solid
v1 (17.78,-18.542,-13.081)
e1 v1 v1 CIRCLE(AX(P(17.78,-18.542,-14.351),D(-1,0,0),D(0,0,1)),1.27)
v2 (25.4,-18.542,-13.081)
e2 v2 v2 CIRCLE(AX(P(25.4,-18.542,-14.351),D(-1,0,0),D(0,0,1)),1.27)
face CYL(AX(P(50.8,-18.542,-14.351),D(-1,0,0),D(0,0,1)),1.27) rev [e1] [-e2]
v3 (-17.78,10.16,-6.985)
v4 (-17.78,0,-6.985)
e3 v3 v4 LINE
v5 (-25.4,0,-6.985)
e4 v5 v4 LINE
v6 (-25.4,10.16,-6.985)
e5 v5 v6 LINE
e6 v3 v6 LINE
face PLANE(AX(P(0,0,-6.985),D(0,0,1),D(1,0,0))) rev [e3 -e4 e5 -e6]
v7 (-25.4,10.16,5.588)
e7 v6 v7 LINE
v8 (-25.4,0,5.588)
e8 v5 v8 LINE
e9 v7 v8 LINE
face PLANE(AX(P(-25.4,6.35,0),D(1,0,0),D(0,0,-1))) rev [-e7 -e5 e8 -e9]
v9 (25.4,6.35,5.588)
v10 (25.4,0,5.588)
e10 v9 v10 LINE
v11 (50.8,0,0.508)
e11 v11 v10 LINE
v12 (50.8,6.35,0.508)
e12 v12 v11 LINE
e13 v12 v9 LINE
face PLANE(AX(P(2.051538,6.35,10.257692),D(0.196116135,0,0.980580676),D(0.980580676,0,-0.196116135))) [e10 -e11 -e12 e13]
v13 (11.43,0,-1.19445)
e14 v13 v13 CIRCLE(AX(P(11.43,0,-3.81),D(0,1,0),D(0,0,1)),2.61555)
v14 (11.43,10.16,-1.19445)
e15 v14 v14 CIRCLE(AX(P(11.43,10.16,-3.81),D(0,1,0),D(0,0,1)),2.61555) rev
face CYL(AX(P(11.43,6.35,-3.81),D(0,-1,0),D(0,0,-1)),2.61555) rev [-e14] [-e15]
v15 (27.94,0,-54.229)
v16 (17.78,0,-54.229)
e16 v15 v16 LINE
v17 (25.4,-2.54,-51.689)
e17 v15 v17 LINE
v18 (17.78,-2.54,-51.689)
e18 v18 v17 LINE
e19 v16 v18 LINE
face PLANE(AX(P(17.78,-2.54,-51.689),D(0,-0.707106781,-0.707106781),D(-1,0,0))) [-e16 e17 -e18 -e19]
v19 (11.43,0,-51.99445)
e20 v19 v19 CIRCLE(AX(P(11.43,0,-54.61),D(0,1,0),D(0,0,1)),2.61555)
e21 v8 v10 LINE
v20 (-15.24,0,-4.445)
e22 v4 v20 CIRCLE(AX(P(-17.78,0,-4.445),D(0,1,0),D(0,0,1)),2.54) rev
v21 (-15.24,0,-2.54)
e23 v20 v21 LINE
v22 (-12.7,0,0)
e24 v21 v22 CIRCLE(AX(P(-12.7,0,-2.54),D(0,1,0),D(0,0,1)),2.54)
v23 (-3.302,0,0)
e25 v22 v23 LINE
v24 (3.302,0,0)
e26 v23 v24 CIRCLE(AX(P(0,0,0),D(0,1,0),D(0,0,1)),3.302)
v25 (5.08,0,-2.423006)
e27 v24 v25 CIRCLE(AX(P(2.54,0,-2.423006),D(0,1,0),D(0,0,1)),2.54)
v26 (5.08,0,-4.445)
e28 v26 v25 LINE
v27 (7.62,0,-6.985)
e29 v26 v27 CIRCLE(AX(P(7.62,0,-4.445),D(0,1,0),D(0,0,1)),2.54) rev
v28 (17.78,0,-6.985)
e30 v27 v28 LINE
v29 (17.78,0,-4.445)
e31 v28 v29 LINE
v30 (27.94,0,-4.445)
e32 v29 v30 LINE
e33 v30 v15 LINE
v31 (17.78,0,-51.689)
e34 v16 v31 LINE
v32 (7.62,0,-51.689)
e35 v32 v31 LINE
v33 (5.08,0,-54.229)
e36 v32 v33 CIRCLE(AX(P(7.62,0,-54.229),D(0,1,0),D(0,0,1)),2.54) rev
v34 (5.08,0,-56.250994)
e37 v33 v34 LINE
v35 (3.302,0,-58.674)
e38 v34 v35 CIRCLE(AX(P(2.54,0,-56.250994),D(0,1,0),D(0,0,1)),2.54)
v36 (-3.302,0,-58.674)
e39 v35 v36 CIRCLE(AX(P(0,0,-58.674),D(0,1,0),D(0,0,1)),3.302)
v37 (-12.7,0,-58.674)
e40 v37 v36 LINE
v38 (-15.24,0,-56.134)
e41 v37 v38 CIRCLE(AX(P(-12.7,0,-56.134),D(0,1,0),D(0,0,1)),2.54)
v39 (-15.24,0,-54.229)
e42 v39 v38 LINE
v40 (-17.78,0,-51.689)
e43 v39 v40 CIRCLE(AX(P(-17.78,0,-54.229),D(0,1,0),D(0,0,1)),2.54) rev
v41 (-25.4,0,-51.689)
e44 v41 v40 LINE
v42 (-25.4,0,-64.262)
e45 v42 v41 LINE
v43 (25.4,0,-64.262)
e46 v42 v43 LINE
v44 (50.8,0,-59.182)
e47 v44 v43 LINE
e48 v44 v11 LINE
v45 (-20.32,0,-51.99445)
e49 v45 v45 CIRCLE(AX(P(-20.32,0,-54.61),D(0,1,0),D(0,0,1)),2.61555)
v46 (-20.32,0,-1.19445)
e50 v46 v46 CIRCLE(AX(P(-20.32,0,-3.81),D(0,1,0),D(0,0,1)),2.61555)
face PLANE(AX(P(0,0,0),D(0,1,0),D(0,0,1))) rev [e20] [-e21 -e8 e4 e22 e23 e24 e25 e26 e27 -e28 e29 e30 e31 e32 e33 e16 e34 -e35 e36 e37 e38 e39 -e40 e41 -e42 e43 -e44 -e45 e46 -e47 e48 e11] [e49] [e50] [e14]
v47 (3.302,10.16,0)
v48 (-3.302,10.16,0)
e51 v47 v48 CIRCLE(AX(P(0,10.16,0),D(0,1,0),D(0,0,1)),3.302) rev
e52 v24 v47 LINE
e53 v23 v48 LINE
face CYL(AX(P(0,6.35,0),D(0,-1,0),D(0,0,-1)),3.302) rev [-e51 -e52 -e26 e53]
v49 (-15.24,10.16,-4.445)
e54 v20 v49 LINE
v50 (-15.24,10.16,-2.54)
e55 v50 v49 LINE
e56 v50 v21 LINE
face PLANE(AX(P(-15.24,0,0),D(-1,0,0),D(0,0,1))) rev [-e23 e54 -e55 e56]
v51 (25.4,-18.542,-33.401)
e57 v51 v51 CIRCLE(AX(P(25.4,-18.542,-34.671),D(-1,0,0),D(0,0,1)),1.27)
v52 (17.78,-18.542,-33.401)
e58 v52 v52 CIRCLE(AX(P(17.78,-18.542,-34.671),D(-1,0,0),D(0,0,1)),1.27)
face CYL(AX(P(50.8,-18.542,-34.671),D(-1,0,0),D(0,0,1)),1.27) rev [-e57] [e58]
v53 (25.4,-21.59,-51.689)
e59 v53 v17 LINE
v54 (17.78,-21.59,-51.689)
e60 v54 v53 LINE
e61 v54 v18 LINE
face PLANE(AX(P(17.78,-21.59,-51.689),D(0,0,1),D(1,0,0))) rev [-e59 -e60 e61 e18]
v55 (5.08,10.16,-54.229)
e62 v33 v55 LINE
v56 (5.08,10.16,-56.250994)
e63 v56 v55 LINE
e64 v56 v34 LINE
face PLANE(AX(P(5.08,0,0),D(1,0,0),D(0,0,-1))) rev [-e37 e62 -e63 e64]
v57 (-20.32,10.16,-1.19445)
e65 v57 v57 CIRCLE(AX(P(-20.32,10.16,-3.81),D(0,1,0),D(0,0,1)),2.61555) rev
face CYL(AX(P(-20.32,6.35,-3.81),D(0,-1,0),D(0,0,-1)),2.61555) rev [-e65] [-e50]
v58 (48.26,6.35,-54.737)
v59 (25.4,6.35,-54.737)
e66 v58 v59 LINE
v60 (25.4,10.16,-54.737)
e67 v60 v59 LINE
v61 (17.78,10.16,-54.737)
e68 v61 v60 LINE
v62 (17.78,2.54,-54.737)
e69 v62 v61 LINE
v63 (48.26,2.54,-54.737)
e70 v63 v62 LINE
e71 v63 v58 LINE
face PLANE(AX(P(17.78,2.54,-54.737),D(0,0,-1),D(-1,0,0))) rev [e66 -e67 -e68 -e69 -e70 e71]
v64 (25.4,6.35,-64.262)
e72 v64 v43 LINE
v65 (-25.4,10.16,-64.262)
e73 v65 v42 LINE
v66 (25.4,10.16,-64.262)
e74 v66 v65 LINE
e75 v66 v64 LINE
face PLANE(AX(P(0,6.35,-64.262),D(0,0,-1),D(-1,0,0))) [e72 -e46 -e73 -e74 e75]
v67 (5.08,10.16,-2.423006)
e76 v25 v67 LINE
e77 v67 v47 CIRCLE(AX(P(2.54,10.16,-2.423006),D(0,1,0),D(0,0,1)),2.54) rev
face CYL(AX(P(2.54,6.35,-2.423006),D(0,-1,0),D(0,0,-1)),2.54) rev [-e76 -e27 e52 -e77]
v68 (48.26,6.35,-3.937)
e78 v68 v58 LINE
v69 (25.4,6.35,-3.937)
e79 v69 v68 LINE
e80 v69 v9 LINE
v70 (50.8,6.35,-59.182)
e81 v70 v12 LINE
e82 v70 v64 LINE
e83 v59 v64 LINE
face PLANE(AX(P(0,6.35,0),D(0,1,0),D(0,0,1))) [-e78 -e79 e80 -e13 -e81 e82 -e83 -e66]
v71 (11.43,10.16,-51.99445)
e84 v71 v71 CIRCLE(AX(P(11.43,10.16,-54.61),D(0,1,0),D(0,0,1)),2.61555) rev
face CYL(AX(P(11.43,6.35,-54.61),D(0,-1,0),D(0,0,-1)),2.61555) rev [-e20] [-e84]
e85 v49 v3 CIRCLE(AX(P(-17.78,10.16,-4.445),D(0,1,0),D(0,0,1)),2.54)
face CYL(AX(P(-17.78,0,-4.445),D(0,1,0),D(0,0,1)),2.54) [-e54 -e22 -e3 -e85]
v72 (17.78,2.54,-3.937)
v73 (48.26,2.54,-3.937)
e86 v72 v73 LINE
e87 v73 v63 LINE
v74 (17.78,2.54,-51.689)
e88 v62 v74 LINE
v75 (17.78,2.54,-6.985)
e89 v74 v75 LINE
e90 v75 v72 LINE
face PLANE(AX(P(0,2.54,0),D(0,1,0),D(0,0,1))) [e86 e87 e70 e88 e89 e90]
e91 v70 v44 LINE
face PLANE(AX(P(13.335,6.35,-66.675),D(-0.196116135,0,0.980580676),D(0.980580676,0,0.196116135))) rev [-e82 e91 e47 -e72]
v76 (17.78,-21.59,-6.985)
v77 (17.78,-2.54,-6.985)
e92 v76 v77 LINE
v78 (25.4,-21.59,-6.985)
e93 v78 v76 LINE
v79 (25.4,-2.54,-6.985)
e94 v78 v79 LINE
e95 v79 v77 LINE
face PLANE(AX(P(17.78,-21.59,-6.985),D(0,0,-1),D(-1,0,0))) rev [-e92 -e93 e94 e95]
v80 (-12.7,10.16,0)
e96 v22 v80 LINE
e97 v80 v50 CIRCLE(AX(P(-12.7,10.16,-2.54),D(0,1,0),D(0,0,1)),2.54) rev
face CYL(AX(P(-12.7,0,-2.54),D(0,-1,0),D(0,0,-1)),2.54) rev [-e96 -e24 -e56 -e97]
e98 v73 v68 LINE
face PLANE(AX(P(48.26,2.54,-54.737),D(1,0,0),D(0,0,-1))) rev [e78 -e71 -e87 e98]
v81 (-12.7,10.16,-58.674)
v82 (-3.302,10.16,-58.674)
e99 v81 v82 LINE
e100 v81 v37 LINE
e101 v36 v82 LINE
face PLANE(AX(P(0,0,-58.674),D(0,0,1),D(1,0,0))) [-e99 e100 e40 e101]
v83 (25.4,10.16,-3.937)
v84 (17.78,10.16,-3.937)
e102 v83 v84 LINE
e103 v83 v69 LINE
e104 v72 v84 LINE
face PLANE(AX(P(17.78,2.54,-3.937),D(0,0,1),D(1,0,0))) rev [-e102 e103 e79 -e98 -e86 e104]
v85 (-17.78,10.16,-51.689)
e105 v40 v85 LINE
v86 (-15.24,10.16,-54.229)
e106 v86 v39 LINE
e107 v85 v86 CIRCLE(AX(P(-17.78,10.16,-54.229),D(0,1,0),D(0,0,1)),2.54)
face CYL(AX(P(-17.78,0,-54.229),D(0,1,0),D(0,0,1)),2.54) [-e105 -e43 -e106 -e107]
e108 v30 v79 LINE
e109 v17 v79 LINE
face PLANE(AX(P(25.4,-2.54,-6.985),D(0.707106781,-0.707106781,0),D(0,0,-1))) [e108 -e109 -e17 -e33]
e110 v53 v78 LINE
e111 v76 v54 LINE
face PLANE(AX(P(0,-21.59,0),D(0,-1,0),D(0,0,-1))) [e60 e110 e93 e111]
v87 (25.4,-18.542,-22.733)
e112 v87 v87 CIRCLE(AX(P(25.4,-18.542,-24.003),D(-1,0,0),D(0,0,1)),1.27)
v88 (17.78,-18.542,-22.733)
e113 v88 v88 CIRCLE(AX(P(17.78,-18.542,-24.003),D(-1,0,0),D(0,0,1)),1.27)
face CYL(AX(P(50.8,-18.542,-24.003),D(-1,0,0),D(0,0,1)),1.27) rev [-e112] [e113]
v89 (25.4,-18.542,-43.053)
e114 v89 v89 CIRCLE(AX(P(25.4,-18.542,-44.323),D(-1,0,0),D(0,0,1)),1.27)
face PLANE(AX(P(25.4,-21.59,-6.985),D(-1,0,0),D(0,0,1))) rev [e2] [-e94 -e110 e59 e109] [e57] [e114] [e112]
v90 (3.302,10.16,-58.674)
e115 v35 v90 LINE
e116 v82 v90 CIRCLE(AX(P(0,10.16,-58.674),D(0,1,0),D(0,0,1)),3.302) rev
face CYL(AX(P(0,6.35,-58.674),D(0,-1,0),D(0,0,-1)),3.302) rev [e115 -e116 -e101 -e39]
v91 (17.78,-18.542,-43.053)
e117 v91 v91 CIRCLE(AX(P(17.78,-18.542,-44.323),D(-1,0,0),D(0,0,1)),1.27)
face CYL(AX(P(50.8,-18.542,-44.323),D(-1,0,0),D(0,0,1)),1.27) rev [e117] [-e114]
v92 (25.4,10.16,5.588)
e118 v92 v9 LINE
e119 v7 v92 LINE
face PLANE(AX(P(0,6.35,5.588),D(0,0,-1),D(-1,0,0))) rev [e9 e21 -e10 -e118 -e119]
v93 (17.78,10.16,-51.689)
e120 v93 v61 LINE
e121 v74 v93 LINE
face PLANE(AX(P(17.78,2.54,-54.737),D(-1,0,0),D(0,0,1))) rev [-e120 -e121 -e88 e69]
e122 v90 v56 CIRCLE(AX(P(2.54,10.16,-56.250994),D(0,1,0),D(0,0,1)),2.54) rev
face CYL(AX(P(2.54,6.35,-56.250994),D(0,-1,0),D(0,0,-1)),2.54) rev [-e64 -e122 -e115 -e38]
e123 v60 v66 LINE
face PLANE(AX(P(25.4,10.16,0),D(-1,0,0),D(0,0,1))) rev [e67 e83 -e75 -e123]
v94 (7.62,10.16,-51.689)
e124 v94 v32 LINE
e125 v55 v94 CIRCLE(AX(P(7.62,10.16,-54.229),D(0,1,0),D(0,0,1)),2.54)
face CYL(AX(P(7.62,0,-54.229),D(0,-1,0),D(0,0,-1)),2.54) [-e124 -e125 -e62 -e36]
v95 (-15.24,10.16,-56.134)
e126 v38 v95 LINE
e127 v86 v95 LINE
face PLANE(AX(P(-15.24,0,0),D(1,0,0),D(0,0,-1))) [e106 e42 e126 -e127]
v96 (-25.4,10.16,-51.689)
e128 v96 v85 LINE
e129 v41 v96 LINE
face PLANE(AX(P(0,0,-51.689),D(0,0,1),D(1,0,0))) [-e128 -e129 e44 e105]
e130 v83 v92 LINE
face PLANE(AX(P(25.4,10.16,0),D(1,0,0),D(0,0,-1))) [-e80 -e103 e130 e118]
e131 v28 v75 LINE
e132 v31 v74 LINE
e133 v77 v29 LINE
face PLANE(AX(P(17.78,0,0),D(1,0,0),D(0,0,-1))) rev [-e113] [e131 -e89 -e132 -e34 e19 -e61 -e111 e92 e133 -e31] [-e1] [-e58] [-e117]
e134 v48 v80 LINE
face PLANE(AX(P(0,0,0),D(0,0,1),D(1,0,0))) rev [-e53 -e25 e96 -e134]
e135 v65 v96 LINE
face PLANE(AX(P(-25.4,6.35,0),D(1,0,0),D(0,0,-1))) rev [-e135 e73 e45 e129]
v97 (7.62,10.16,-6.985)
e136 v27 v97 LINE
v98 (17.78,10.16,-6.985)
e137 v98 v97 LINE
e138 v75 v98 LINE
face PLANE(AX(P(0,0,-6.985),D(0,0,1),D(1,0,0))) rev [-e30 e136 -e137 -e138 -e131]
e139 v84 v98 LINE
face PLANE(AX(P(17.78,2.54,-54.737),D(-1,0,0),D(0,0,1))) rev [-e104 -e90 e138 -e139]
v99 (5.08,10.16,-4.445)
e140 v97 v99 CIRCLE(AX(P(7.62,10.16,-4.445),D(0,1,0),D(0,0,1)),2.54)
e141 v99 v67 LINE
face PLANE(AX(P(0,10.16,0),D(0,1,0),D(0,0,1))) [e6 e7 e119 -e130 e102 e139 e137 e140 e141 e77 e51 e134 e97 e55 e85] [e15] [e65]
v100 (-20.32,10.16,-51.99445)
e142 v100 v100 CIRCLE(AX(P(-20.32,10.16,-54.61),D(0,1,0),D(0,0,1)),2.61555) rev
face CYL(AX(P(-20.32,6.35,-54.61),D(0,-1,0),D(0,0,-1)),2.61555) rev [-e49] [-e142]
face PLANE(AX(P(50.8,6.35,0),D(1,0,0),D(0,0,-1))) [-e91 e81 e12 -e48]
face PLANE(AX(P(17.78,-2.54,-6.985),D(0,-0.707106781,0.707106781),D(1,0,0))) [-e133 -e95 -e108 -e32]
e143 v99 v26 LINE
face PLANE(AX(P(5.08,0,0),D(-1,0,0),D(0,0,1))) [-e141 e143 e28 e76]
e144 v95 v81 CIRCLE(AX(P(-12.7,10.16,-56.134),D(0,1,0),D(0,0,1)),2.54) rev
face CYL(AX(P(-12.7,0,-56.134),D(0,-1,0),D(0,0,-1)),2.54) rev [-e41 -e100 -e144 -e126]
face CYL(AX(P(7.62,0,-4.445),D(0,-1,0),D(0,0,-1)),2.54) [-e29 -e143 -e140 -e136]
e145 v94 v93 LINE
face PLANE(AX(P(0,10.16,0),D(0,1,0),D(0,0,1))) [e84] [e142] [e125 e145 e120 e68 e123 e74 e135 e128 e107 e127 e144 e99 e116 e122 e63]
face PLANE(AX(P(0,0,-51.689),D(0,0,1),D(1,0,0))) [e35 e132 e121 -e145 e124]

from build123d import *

# Parameters (mm, degrees)
SKETCH1_R           = 3.302
SKETCH1_R_2         = 2.615549664
BOSS_EXTRUDE1_DEPTH = 6.35
SKETCH2_W           = 30.48
SKETCH2_H           = 50.8
CUT_EXTRUDE1_DEPTH  = 3.81
CUT_EXTRUDE2_DEPTH  = 83.161835082
SKETCH13_R          = 2.615549664
BOSS_EXTRUDE7_DEPTH = 3.81
SKETCH15_W          = 7.62
SKETCH15_H          = 44.704
BOSS_EXTRUDE8_DEPTH = 21.59
SKETCH16_R          = 1.27
CUT_EXTRUDE3_DEPTH  = 81.375650193
FILLET1_R           = 2.54
CHAMFER2_SIZE       = 2.54


with BuildPart() as part:
    # Sketch1 → Boss-Extrude1 (new body)
    with BuildSketch(Plane(origin=(0, 0, 0), x_dir=(1, 0, 0), z_dir=(0, 1, 0))):
        Polygon((50.8, -0.508), (25.4, -5.588), (-25.4, -5.588), (-25.4, 64.262), (25.4, 64.262), (50.8, 59.182), align=None)
        with Locations(Location((0, 0, 0), (0, 0, 270))):
            Circle(SKETCH1_R, mode=Mode.SUBTRACT)
        with Locations(Location((0, 58.674, 0), (0, 0, 270))):
            Circle(SKETCH1_R, mode=Mode.SUBTRACT)
        with Locations(Location((11.43, 54.61, 0), (0, 0, 270))):
            Circle(SKETCH1_R_2, mode=Mode.SUBTRACT)
        with Locations(Location((-20.32, 54.61, 0), (0, 0, 270))):
            Circle(SKETCH1_R_2, mode=Mode.SUBTRACT)
        with Locations(Location((-20.32, 3.81, 0), (0, 0, 270))):
            Circle(SKETCH1_R_2, mode=Mode.SUBTRACT)
        with Locations(Location((11.43, 3.81, 0), (0, 0, 270))):
            Circle(SKETCH1_R_2, mode=Mode.SUBTRACT)
    extrude(amount=BOSS_EXTRUDE1_DEPTH)

    # Sketch2 → Cut-Extrude1 (cut)
    with BuildSketch(Plane(origin=(0, 6.35, 0), x_dir=(1, 0, 0), z_dir=(0, 1, 0))):
        with Locations((33.02, 29.337)):
            Rectangle(SKETCH2_W, SKETCH2_H)
    extrude(amount=-CUT_EXTRUDE1_DEPTH, mode=Mode.SUBTRACT)

    # Sketch3 → Cut-Extrude2 (cut, through all)
    with BuildSketch(Plane(origin=(0, 6.35, 0), x_dir=(1, 0, 0), z_dir=(0, 1, 0))):
        with BuildLine():
            Line((-15.24, 58.674), (-15.24, 51.689))
            Line((-15.24, 51.689), (5.08, 51.689))
            Line((5.08, 51.689), (5.08, 58.674))
            Line((5.08, 58.674), (3.302, 58.674))
            ThreePointArc((3.302, 58.674), (0, 55.372), (-3.302, 58.674))
            Line((-3.302, 58.674), (-15.24, 58.674))
        make_face()
        Polygon((-15.24, 51.689), (-25.4, 51.689), (-25.4, 6.985), (-15.24, 6.985), (5.08, 6.985), (17.78, 6.985), (17.78, 51.689), (5.08, 51.689), align=None)
        with BuildLine():
            Line((5.08, 6.985), (-15.24, 6.985))
            Line((-15.24, 6.985), (-15.24, 0))
            Line((-15.24, 0), (-3.302, 0))
            ThreePointArc((-3.302, 0), (0, 3.302), (3.302, 0))
            Line((3.302, 0), (5.08, 0))
            Line((5.08, 0), (5.08, 6.985))
        make_face()
    extrude(amount=-CUT_EXTRUDE2_DEPTH, mode=Mode.SUBTRACT)

    # Sketch13 → Boss-Extrude7 (add)
    # profile 1 of 2: a face of its own
    with BuildSketch(Plane(origin=(0, 6.35, 0), x_dir=(1, 0, 0), z_dir=(0, 1, 0))):
        with BuildLine():
            Line((-25.4, 64.262), (-25.4, 51.689))
            Line((-25.4, 51.689), (-15.24, 51.689))
            Line((-15.24, 51.689), (-15.24, 58.674))
            Line((-15.24, 58.674), (-3.302, 58.674))
            ThreePointArc((-3.302, 58.674), (0, 61.976), (3.302, 58.674))
            Line((3.302, 58.674), (5.08, 58.674))
            Line((5.08, 58.674), (5.08, 51.689))
            Line((5.08, 51.689), (17.78, 51.689))
            Line((17.78, 51.689), (17.78, 54.737))
            Line((17.78, 54.737), (25.4, 54.737))
            Line((25.4, 54.737), (25.4, 64.262))
            Line((25.4, 64.262), (-25.4, 64.262))
        make_face()
        with Locations(Location((-20.32, 54.61, 0), (0, 0, 270))):
            Circle(SKETCH13_R, mode=Mode.SUBTRACT)
        with Locations(Location((11.43, 54.61, 0), (0, 0, 270))):
            Circle(SKETCH13_R, mode=Mode.SUBTRACT)
    # profile 2 of 2: a face of its own
    with BuildSketch(Plane(origin=(0, 6.35, 0), x_dir=(1, 0, 0), z_dir=(0, 1, 0))):
        with BuildLine():
            Line((-15.24, 6.985), (-25.4, 6.985))
            Line((-25.4, 6.985), (-25.4, -5.588))
            Line((-25.4, -5.588), (25.4, -5.588))
            Line((25.4, -5.588), (25.4, 3.937))
            Line((25.4, 3.937), (17.78, 3.937))
            Line((17.78, 3.937), (17.78, 6.985))
            Line((17.78, 6.985), (5.08, 6.985))
            Line((5.08, 6.985), (5.08, 0))
            Line((5.08, 0), (3.302, 0))
            ThreePointArc((3.302, 0), (0, -3.302), (-3.302, 0))
            Line((-3.302, 0), (-15.24, 0))
            Line((-15.24, 0), (-15.24, 6.985))
        make_face()
        with Locations(Location((-20.32, 3.81, 0), (0, 0, 270))):
            Circle(SKETCH13_R, mode=Mode.SUBTRACT)
        with Locations(Location((11.43, 3.81, 0), (0, 0, 270))):
            Circle(SKETCH13_R, mode=Mode.SUBTRACT)
    extrude(amount=BOSS_EXTRUDE7_DEPTH)

    # Sketch15 → Boss-Extrude8 (add)
    with BuildSketch(Plane.XZ):
        with Locations((21.59, -29.337)):
            Rectangle(SKETCH15_W, SKETCH15_H)
    extrude(amount=BOSS_EXTRUDE8_DEPTH)

    # Sketch16 → Cut-Extrude3 (cut, through all)
    with BuildSketch(Plane.ZY.offset(-17.78)):
        with Locations((-44.323, -18.542)):
            Circle(SKETCH16_R)
        with Locations((-34.671, -18.542)):
            Circle(SKETCH16_R)
        with Locations((-24.003, -18.542)):
            Circle(SKETCH16_R)
        with Locations((-14.351, -18.542)):
            Circle(SKETCH16_R)
    extrude(amount=-CUT_EXTRUDE3_DEPTH, mode=Mode.SUBTRACT)

    # Fillet1
    # the kernel refuses this fillet: 2.54 mm, written as the material it adds along each edge
    with BuildSketch(Plane(origin=(-15.24, 0, -58.674), x_dir=(0, 0, 1), z_dir=(0, 1, 0))) as fillet1_piece_1:
        with BuildLine():
            CenterArc((FILLET1_R, FILLET1_R), FILLET1_R, 180, 90)
            Line((0, FILLET1_R), (0, 0))
            Line((0, 0), (FILLET1_R, 0))
        make_face()
    extrude(amount=10.16)
    with BuildSketch(Plane(origin=(5.08, 10.16, -58.674), x_dir=(-1, 0, 0), z_dir=(0, -1, 0))) as fillet1_piece_2:
        with BuildLine():
            CenterArc((2.54, -2.423005572), FILLET1_R, 107.457603124, 72.542396876)
            Line((0, -2.423005572), (0, 0))
            Line((0, 0), (1.778, 0))
        make_face()
    extrude(amount=10.16)
    with BuildSketch(Plane(origin=(5.08, 10.16, 0), x_dir=(0, 0, -1), z_dir=(0, -1, 0))) as fillet1_piece_3:
        with BuildLine():
            CenterArc((2.423005572, -2.54), FILLET1_R, 90, 72.542396876)
            Line((0, -1.778), (0, 0))
            Line((0, 0), (2.423005572, 0))
        make_face()
    extrude(amount=10.16)
    with BuildSketch(Plane(origin=(-15.24, 10.16, 0), x_dir=(1, 0, 0), z_dir=(0, -1, 0))) as fillet1_piece_4:
        with BuildLine():
            CenterArc((FILLET1_R, -FILLET1_R), FILLET1_R, 90, 90)
            Line((0, -FILLET1_R), (0, 0))
            Line((0, 0), (FILLET1_R, 0))
        make_face()
    extrude(amount=10.16)
    # the kernel refuses this fillet: 2.54 mm, written as the material it takes off along each edge
    with BuildSketch(Plane(origin=(-15.24, -6.35, -51.689), x_dir=(-1, 0, 0), z_dir=(0, 1, 0))) as fillet1_2_piece_1:
        with BuildLine():
            CenterArc((FILLET1_R, -FILLET1_R), FILLET1_R, 90, 90)
            Line((0, -FILLET1_R), (0, 0))
            Line((0, 0), (FILLET1_R, 0))
        make_face()
    extrude(amount=22.86, mode=Mode.SUBTRACT)
    with BuildSketch(Plane(origin=(5.08, 16.51, -51.689), x_dir=(0, 0, -1), z_dir=(0, -1, 0)), Plane(origin=(5.08, 16.51, -6.985), x_dir=(1, 0, 0), z_dir=(0, -1, 0)), Plane(origin=(-15.24, 16.51, -6.985), x_dir=(0, 0, 1), z_dir=(0, -1, 0))) as fillet1_2_piece_2:
        with BuildLine():
            CenterArc((FILLET1_R, FILLET1_R), FILLET1_R, 180, 90)
            Line((0, FILLET1_R), (0, 0))
            Line((0, 0), (FILLET1_R, 0))
        make_face()
    extrude(amount=22.86, mode=Mode.SUBTRACT)

    # Chamfer2
    chamfer2_edges = [part.edges().sort_by_distance(p)[0] for p in [
        (21.59, 0, -51.689),
        (25.4, 0, -29.337),
        (21.59, 0, -6.985),
    ]]
    chamfer(chamfer2_edges, length=CHAMFER2_SIZE)


solid = part.part
